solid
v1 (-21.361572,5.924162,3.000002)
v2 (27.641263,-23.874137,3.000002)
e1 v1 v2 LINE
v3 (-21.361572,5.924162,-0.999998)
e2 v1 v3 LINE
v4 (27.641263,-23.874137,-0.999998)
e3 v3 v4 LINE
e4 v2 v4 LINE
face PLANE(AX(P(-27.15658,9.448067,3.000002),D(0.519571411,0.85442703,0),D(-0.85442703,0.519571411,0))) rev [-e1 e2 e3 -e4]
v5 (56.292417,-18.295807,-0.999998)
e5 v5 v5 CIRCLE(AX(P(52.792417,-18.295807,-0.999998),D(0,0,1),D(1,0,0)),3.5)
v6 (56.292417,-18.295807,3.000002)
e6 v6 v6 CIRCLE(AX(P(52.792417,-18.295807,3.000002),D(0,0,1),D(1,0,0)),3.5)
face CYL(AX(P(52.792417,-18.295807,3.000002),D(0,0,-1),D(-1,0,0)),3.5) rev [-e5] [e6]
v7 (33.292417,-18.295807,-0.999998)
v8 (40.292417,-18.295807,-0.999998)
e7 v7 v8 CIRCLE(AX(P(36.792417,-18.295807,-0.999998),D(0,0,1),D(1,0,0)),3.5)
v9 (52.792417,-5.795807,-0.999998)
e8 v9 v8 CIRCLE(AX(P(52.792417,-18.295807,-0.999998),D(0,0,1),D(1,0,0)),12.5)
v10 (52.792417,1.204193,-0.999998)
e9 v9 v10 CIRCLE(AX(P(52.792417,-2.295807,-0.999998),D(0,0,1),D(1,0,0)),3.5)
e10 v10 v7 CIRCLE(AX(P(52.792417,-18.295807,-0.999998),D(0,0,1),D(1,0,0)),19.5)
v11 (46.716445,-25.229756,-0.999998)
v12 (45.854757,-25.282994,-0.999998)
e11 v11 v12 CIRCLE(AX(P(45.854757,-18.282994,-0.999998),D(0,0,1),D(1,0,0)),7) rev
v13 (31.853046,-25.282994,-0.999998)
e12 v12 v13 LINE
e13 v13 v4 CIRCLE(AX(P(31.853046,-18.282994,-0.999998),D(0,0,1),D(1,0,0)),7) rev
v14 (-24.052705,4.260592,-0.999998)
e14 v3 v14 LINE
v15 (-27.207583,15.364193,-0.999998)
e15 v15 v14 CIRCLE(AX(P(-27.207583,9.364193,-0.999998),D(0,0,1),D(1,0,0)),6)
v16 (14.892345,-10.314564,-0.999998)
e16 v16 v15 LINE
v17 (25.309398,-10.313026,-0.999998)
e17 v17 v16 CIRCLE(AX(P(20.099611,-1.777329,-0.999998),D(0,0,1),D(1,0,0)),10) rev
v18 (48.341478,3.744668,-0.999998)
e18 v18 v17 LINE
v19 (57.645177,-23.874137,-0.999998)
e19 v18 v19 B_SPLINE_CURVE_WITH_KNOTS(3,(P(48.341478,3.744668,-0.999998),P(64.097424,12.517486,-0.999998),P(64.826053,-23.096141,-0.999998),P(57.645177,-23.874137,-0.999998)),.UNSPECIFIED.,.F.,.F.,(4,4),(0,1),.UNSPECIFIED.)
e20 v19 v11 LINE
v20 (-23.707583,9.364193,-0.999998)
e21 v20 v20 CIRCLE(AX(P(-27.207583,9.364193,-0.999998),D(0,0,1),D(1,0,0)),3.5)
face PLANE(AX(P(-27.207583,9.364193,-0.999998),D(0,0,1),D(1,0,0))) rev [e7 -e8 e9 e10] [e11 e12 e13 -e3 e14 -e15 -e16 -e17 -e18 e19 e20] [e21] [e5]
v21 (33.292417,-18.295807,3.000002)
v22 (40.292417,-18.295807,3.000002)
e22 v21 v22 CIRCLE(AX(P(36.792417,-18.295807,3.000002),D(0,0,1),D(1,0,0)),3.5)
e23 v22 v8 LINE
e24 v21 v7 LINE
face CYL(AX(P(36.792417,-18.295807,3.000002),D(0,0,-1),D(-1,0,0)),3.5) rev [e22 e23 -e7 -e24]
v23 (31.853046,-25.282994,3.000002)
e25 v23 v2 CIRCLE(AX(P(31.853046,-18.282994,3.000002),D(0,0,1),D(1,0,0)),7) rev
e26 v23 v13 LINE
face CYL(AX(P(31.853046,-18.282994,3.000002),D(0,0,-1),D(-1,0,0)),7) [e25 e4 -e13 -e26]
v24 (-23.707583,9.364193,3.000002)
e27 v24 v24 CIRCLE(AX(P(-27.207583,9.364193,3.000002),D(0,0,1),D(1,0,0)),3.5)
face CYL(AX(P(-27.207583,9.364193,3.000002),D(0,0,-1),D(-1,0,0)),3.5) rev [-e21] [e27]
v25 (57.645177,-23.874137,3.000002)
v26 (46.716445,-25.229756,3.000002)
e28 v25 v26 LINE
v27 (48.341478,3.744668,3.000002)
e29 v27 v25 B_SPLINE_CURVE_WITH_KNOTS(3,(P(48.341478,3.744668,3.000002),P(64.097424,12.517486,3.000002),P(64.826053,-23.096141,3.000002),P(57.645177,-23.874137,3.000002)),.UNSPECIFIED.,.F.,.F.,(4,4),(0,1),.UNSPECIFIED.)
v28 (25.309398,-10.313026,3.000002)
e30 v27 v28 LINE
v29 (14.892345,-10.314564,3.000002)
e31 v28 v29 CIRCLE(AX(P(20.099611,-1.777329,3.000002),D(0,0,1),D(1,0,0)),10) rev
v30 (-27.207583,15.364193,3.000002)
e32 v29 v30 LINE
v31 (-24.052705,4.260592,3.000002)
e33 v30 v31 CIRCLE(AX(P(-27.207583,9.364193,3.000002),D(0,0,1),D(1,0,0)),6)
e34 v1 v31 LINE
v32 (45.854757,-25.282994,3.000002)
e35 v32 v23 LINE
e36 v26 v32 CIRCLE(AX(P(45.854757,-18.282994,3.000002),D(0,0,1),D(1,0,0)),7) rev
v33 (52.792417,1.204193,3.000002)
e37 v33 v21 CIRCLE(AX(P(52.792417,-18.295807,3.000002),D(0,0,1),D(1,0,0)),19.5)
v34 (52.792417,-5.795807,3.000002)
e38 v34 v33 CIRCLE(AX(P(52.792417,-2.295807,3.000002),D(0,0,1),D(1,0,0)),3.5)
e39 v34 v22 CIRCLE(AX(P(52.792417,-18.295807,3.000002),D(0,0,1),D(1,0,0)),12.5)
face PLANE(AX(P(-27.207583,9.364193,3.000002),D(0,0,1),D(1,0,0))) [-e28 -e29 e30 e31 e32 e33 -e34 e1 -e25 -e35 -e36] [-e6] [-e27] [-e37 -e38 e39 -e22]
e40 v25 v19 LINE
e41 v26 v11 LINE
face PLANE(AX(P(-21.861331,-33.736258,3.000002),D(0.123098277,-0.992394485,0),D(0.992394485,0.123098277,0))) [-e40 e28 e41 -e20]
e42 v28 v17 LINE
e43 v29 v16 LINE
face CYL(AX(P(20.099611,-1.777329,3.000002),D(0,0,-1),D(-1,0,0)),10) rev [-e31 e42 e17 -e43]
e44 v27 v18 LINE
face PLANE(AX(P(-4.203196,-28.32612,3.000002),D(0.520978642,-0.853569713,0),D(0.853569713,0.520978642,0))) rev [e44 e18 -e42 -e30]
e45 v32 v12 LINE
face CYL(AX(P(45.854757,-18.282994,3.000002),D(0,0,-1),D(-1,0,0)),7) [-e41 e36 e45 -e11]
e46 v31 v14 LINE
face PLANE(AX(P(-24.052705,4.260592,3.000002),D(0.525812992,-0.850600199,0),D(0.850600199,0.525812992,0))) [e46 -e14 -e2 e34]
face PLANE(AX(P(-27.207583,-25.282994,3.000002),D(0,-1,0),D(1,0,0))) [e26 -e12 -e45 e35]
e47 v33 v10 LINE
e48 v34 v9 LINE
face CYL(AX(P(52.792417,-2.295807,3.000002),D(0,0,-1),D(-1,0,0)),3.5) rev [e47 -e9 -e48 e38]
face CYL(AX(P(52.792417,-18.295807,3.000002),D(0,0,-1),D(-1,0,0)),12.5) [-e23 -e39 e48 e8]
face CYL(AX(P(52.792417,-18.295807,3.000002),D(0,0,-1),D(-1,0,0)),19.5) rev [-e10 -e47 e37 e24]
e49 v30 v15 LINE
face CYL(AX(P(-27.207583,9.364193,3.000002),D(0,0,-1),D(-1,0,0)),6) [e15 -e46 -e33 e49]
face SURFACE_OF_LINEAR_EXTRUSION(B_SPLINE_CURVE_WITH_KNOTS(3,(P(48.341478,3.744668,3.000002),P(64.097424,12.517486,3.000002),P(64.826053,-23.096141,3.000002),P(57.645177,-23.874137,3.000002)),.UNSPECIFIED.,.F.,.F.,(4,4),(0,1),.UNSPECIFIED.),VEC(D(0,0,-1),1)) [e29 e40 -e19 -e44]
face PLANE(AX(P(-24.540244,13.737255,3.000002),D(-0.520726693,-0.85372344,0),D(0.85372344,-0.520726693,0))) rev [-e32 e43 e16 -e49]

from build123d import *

# Parameters (mm, degrees)
SKETCH1_R           = 1.75
BOSS_EXTRUDE1_DEPTH = 2
SCALE1_DEPTH        = 2
SCALE1_START        = -0.999997816
SCALE1_2_OUTLINE_R  = 3.5
SCALE1_2_DEPTH      = 4


# Read off the part's stored shape, not the designer's step: Scale1
with BuildPart() as part:
    # Sketch1 → Boss-Extrude1 (new body)
    with BuildSketch(Plane.XY):
        with BuildLine():
            Line((37.774530777, -2.80976251), (26.258490635, -9.838609559))
            ThreePointArc((26.258490635, -9.838609559), (23.654335286, -10.570760941), (21.04996396, -9.839378194))
            Line((21.04996396, -9.839378194), (0, 3))
            ThreePointArc((0, 3), (-2.885775614, -0.819938477), (1.577438975, -2.551800596))
            Line((1.577438975, -2.551800596), (2.923005699, -1.720015621))
            Line((2.923005699, -1.720015621), (27.42442319, -16.619165126))
            ThreePointArc((27.42442319, -16.619165126), (28.420022181, -17.142817893), (29.530314816, -17.323593546))
            Line((29.530314816, -17.323593546), (36.531170313, -17.323593546))
            ThreePointArc((36.531170313, -17.323593546), (36.747003069, -17.316932382), (36.962014284, -17.296974244))
            Line((36.962014284, -17.296974244), (42.4263802, -16.619165126))
            add(Edge.make_bspline(
                [(37.774530777, -2.80976251), (45.652503852, 1.576646515), (46.016818074, -16.230167124), (42.4263802, -16.619165126)],
                knots=[0, 0, 0, 0, 1, 1, 1, 1], degree=3))
        make_face()
        Circle(SKETCH1_R, mode=Mode.SUBTRACT)
        with Locations((40, -13.83)):
            Circle(SKETCH1_R, mode=Mode.SUBTRACT)
        with BuildLine():
            ThreePointArc((40, -7.58), (41.75, -5.83), (40, -4.08))
            ThreePointArc((40, -4.08), (33.105708883, -6.935708883), (30.25, -13.83))
            ThreePointArc((30.25, -13.83), (32, -15.58), (33.75, -13.83))
            ThreePointArc((33.75, -13.83), (35.580582618, -9.410582618), (40, -7.58))
        make_face(mode=Mode.SUBTRACT)
    extrude(amount=BOSS_EXTRUDE1_DEPTH)

    # Scale1 outline → Scale1 (cut)
    with BuildSketch(Plane.XY):
        with BuildLine():
            Line((25.309397888, -10.313026346), (25.407923969, -10.252890679))
            ThreePointArc((25.407923969, -10.252890679), (23.18128534, -10.548403138), (21.04996396, -9.839378194))
            Line((21.04996396, -9.839378194), (0, 3))
            ThreePointArc((0, 3), (-1.910769589, 2.312781783), (-2.946128732, 0.565973052))
            Line((-2.946128732, 0.565973052), (-1.741862619, -0.168566356))
            ThreePointArc((-1.741862619, -0.168566356), (0.911271712, 1.494016019), (0.647354046, -1.62586369))
            Line((0.647354046, -1.62586369), (1.869458664, -2.371283654))
            Line((1.869458664, -2.371283654), (2.923005699, -1.720015621))
            Line((2.923005699, -1.720015621), (19.42459166, -11.75452062))
            ThreePointArc((19.42459166, -11.75452062), (22.478792733, -11.490181349), (25.309397888, -10.313026346))
        make_face()
        with BuildLine():
            add(Edge.make_bspline(
                [(41.45450238, -2.430697688), (43.278912085, -3.340053045), (44.251250713, -6.082636591), (44.527913808, -8.917748085)],
                knots=[0.188633601, 0.188633601, 0.188633601, 0.188633601, 0.541520813, 0.541520813, 0.541520813, 0.541520813], degree=3))
            ThreePointArc((41.45450238, -2.430697688), (40.4125829, -3.229629308), (39.426788196, -4.096864419))
            ThreePointArc((39.426788196, -4.096864419), (39.713270083, -4.084217017), (40, -4.08))
            ThreePointArc((40, -4.08), (41.75, -5.83), (40, -7.58))
            ThreePointArc((40, -7.58), (37.394812966, -8.148846903), (35.263850756, -9.751839835))
            ThreePointArc((35.263850756, -9.751839835), (33.906901167, -13.439130778), (33.316667581, -17.323593546))
            Line((33.316667581, -17.323593546), (36.531170313, -17.323593546))
            ThreePointArc((36.531170313, -17.323593546), (36.747003069, -17.316932382), (36.962014284, -17.296974244))
            Line((36.962014284, -17.296974244), (40.373564213, -16.873799866))
            ThreePointArc((40.373564213, -16.873799866), (40.47496583, -16.16733217), (40.616522643, -15.467803355))
            ThreePointArc((40.616522643, -15.467803355), (38.347783736, -13.253214584), (41.501863894, -12.931721176))
            ThreePointArc((41.501863894, -12.931721176), (42.811031733, -10.771051035), (44.527913808, -8.917748085))
        make_face()
    extrude(amount=SCALE1_DEPTH, mode=Mode.SUBTRACT)

    # Scale1 2 outline → Scale1 2 (add)
    with BuildSketch(Plane.XY.offset(SCALE1_START)):
        with BuildLine():
            add(Edge.make_bspline(
                [(48.341478172, 3.744667751), (64.097424322, 12.517485802), (64.826052766, -23.096141476), (57.645177019, -23.874137481)],
                knots=[0, 0, 0, 0, 1, 1, 1, 1], degree=3))
            Line((48.341478172, 3.744667751), (25.309397888, -10.313026346))
            ThreePointArc((25.309397888, -10.313026346), (20.101087191, -11.77732911), (14.892344539, -10.314563616))
            Line((14.892344539, -10.314563616), (-27.207583382, 15.364192772))
            ThreePointArc((-27.207583382, 15.364192772), (-32.97913461, 7.724315817), (-24.052705432, 4.26059158))
            Line((-24.052705432, 4.26059158), (-21.361571984, 5.924161529))
            Line((-21.361571984, 5.924161529), (27.641262999, -23.874137481))
            ThreePointArc((27.641262999, -23.874137481), (29.632460981, -24.921443014), (31.85304625, -25.28299432))
            Line((31.85304625, -25.28299432), (45.854757245, -25.28299432))
            ThreePointArc((45.854757245, -25.28299432), (46.286422756, -25.269671992), (46.716445185, -25.229755716))
            Line((46.716445185, -25.229755716), (57.645177019, -23.874137481))
        make_face()
        with BuildLine():
            ThreePointArc((33.292416618, -18.295807228), (39.003834385, -4.507224995), (52.792416618, 1.204192772))
            ThreePointArc((52.792416618, 1.204192772), (56.292416618, -2.295807228), (52.792416618, -5.795807228))
            ThreePointArc((52.792416618, -5.795807228), (43.953581853, -9.456972464), (40.292416618, -18.295807228))
            ThreePointArc((40.292416618, -18.295807228), (36.792416618, -21.795807228), (33.292416618, -18.295807228))
        make_face(mode=Mode.SUBTRACT)
        with Locations((52.792416618, -18.295807228)):
            Circle(SCALE1_2_OUTLINE_R, mode=Mode.SUBTRACT)
        with Locations((-27.207583382, 9.364192772)):
            Circle(SCALE1_2_OUTLINE_R, mode=Mode.SUBTRACT)
    extrude(amount=SCALE1_2_DEPTH)


solid = part.part
